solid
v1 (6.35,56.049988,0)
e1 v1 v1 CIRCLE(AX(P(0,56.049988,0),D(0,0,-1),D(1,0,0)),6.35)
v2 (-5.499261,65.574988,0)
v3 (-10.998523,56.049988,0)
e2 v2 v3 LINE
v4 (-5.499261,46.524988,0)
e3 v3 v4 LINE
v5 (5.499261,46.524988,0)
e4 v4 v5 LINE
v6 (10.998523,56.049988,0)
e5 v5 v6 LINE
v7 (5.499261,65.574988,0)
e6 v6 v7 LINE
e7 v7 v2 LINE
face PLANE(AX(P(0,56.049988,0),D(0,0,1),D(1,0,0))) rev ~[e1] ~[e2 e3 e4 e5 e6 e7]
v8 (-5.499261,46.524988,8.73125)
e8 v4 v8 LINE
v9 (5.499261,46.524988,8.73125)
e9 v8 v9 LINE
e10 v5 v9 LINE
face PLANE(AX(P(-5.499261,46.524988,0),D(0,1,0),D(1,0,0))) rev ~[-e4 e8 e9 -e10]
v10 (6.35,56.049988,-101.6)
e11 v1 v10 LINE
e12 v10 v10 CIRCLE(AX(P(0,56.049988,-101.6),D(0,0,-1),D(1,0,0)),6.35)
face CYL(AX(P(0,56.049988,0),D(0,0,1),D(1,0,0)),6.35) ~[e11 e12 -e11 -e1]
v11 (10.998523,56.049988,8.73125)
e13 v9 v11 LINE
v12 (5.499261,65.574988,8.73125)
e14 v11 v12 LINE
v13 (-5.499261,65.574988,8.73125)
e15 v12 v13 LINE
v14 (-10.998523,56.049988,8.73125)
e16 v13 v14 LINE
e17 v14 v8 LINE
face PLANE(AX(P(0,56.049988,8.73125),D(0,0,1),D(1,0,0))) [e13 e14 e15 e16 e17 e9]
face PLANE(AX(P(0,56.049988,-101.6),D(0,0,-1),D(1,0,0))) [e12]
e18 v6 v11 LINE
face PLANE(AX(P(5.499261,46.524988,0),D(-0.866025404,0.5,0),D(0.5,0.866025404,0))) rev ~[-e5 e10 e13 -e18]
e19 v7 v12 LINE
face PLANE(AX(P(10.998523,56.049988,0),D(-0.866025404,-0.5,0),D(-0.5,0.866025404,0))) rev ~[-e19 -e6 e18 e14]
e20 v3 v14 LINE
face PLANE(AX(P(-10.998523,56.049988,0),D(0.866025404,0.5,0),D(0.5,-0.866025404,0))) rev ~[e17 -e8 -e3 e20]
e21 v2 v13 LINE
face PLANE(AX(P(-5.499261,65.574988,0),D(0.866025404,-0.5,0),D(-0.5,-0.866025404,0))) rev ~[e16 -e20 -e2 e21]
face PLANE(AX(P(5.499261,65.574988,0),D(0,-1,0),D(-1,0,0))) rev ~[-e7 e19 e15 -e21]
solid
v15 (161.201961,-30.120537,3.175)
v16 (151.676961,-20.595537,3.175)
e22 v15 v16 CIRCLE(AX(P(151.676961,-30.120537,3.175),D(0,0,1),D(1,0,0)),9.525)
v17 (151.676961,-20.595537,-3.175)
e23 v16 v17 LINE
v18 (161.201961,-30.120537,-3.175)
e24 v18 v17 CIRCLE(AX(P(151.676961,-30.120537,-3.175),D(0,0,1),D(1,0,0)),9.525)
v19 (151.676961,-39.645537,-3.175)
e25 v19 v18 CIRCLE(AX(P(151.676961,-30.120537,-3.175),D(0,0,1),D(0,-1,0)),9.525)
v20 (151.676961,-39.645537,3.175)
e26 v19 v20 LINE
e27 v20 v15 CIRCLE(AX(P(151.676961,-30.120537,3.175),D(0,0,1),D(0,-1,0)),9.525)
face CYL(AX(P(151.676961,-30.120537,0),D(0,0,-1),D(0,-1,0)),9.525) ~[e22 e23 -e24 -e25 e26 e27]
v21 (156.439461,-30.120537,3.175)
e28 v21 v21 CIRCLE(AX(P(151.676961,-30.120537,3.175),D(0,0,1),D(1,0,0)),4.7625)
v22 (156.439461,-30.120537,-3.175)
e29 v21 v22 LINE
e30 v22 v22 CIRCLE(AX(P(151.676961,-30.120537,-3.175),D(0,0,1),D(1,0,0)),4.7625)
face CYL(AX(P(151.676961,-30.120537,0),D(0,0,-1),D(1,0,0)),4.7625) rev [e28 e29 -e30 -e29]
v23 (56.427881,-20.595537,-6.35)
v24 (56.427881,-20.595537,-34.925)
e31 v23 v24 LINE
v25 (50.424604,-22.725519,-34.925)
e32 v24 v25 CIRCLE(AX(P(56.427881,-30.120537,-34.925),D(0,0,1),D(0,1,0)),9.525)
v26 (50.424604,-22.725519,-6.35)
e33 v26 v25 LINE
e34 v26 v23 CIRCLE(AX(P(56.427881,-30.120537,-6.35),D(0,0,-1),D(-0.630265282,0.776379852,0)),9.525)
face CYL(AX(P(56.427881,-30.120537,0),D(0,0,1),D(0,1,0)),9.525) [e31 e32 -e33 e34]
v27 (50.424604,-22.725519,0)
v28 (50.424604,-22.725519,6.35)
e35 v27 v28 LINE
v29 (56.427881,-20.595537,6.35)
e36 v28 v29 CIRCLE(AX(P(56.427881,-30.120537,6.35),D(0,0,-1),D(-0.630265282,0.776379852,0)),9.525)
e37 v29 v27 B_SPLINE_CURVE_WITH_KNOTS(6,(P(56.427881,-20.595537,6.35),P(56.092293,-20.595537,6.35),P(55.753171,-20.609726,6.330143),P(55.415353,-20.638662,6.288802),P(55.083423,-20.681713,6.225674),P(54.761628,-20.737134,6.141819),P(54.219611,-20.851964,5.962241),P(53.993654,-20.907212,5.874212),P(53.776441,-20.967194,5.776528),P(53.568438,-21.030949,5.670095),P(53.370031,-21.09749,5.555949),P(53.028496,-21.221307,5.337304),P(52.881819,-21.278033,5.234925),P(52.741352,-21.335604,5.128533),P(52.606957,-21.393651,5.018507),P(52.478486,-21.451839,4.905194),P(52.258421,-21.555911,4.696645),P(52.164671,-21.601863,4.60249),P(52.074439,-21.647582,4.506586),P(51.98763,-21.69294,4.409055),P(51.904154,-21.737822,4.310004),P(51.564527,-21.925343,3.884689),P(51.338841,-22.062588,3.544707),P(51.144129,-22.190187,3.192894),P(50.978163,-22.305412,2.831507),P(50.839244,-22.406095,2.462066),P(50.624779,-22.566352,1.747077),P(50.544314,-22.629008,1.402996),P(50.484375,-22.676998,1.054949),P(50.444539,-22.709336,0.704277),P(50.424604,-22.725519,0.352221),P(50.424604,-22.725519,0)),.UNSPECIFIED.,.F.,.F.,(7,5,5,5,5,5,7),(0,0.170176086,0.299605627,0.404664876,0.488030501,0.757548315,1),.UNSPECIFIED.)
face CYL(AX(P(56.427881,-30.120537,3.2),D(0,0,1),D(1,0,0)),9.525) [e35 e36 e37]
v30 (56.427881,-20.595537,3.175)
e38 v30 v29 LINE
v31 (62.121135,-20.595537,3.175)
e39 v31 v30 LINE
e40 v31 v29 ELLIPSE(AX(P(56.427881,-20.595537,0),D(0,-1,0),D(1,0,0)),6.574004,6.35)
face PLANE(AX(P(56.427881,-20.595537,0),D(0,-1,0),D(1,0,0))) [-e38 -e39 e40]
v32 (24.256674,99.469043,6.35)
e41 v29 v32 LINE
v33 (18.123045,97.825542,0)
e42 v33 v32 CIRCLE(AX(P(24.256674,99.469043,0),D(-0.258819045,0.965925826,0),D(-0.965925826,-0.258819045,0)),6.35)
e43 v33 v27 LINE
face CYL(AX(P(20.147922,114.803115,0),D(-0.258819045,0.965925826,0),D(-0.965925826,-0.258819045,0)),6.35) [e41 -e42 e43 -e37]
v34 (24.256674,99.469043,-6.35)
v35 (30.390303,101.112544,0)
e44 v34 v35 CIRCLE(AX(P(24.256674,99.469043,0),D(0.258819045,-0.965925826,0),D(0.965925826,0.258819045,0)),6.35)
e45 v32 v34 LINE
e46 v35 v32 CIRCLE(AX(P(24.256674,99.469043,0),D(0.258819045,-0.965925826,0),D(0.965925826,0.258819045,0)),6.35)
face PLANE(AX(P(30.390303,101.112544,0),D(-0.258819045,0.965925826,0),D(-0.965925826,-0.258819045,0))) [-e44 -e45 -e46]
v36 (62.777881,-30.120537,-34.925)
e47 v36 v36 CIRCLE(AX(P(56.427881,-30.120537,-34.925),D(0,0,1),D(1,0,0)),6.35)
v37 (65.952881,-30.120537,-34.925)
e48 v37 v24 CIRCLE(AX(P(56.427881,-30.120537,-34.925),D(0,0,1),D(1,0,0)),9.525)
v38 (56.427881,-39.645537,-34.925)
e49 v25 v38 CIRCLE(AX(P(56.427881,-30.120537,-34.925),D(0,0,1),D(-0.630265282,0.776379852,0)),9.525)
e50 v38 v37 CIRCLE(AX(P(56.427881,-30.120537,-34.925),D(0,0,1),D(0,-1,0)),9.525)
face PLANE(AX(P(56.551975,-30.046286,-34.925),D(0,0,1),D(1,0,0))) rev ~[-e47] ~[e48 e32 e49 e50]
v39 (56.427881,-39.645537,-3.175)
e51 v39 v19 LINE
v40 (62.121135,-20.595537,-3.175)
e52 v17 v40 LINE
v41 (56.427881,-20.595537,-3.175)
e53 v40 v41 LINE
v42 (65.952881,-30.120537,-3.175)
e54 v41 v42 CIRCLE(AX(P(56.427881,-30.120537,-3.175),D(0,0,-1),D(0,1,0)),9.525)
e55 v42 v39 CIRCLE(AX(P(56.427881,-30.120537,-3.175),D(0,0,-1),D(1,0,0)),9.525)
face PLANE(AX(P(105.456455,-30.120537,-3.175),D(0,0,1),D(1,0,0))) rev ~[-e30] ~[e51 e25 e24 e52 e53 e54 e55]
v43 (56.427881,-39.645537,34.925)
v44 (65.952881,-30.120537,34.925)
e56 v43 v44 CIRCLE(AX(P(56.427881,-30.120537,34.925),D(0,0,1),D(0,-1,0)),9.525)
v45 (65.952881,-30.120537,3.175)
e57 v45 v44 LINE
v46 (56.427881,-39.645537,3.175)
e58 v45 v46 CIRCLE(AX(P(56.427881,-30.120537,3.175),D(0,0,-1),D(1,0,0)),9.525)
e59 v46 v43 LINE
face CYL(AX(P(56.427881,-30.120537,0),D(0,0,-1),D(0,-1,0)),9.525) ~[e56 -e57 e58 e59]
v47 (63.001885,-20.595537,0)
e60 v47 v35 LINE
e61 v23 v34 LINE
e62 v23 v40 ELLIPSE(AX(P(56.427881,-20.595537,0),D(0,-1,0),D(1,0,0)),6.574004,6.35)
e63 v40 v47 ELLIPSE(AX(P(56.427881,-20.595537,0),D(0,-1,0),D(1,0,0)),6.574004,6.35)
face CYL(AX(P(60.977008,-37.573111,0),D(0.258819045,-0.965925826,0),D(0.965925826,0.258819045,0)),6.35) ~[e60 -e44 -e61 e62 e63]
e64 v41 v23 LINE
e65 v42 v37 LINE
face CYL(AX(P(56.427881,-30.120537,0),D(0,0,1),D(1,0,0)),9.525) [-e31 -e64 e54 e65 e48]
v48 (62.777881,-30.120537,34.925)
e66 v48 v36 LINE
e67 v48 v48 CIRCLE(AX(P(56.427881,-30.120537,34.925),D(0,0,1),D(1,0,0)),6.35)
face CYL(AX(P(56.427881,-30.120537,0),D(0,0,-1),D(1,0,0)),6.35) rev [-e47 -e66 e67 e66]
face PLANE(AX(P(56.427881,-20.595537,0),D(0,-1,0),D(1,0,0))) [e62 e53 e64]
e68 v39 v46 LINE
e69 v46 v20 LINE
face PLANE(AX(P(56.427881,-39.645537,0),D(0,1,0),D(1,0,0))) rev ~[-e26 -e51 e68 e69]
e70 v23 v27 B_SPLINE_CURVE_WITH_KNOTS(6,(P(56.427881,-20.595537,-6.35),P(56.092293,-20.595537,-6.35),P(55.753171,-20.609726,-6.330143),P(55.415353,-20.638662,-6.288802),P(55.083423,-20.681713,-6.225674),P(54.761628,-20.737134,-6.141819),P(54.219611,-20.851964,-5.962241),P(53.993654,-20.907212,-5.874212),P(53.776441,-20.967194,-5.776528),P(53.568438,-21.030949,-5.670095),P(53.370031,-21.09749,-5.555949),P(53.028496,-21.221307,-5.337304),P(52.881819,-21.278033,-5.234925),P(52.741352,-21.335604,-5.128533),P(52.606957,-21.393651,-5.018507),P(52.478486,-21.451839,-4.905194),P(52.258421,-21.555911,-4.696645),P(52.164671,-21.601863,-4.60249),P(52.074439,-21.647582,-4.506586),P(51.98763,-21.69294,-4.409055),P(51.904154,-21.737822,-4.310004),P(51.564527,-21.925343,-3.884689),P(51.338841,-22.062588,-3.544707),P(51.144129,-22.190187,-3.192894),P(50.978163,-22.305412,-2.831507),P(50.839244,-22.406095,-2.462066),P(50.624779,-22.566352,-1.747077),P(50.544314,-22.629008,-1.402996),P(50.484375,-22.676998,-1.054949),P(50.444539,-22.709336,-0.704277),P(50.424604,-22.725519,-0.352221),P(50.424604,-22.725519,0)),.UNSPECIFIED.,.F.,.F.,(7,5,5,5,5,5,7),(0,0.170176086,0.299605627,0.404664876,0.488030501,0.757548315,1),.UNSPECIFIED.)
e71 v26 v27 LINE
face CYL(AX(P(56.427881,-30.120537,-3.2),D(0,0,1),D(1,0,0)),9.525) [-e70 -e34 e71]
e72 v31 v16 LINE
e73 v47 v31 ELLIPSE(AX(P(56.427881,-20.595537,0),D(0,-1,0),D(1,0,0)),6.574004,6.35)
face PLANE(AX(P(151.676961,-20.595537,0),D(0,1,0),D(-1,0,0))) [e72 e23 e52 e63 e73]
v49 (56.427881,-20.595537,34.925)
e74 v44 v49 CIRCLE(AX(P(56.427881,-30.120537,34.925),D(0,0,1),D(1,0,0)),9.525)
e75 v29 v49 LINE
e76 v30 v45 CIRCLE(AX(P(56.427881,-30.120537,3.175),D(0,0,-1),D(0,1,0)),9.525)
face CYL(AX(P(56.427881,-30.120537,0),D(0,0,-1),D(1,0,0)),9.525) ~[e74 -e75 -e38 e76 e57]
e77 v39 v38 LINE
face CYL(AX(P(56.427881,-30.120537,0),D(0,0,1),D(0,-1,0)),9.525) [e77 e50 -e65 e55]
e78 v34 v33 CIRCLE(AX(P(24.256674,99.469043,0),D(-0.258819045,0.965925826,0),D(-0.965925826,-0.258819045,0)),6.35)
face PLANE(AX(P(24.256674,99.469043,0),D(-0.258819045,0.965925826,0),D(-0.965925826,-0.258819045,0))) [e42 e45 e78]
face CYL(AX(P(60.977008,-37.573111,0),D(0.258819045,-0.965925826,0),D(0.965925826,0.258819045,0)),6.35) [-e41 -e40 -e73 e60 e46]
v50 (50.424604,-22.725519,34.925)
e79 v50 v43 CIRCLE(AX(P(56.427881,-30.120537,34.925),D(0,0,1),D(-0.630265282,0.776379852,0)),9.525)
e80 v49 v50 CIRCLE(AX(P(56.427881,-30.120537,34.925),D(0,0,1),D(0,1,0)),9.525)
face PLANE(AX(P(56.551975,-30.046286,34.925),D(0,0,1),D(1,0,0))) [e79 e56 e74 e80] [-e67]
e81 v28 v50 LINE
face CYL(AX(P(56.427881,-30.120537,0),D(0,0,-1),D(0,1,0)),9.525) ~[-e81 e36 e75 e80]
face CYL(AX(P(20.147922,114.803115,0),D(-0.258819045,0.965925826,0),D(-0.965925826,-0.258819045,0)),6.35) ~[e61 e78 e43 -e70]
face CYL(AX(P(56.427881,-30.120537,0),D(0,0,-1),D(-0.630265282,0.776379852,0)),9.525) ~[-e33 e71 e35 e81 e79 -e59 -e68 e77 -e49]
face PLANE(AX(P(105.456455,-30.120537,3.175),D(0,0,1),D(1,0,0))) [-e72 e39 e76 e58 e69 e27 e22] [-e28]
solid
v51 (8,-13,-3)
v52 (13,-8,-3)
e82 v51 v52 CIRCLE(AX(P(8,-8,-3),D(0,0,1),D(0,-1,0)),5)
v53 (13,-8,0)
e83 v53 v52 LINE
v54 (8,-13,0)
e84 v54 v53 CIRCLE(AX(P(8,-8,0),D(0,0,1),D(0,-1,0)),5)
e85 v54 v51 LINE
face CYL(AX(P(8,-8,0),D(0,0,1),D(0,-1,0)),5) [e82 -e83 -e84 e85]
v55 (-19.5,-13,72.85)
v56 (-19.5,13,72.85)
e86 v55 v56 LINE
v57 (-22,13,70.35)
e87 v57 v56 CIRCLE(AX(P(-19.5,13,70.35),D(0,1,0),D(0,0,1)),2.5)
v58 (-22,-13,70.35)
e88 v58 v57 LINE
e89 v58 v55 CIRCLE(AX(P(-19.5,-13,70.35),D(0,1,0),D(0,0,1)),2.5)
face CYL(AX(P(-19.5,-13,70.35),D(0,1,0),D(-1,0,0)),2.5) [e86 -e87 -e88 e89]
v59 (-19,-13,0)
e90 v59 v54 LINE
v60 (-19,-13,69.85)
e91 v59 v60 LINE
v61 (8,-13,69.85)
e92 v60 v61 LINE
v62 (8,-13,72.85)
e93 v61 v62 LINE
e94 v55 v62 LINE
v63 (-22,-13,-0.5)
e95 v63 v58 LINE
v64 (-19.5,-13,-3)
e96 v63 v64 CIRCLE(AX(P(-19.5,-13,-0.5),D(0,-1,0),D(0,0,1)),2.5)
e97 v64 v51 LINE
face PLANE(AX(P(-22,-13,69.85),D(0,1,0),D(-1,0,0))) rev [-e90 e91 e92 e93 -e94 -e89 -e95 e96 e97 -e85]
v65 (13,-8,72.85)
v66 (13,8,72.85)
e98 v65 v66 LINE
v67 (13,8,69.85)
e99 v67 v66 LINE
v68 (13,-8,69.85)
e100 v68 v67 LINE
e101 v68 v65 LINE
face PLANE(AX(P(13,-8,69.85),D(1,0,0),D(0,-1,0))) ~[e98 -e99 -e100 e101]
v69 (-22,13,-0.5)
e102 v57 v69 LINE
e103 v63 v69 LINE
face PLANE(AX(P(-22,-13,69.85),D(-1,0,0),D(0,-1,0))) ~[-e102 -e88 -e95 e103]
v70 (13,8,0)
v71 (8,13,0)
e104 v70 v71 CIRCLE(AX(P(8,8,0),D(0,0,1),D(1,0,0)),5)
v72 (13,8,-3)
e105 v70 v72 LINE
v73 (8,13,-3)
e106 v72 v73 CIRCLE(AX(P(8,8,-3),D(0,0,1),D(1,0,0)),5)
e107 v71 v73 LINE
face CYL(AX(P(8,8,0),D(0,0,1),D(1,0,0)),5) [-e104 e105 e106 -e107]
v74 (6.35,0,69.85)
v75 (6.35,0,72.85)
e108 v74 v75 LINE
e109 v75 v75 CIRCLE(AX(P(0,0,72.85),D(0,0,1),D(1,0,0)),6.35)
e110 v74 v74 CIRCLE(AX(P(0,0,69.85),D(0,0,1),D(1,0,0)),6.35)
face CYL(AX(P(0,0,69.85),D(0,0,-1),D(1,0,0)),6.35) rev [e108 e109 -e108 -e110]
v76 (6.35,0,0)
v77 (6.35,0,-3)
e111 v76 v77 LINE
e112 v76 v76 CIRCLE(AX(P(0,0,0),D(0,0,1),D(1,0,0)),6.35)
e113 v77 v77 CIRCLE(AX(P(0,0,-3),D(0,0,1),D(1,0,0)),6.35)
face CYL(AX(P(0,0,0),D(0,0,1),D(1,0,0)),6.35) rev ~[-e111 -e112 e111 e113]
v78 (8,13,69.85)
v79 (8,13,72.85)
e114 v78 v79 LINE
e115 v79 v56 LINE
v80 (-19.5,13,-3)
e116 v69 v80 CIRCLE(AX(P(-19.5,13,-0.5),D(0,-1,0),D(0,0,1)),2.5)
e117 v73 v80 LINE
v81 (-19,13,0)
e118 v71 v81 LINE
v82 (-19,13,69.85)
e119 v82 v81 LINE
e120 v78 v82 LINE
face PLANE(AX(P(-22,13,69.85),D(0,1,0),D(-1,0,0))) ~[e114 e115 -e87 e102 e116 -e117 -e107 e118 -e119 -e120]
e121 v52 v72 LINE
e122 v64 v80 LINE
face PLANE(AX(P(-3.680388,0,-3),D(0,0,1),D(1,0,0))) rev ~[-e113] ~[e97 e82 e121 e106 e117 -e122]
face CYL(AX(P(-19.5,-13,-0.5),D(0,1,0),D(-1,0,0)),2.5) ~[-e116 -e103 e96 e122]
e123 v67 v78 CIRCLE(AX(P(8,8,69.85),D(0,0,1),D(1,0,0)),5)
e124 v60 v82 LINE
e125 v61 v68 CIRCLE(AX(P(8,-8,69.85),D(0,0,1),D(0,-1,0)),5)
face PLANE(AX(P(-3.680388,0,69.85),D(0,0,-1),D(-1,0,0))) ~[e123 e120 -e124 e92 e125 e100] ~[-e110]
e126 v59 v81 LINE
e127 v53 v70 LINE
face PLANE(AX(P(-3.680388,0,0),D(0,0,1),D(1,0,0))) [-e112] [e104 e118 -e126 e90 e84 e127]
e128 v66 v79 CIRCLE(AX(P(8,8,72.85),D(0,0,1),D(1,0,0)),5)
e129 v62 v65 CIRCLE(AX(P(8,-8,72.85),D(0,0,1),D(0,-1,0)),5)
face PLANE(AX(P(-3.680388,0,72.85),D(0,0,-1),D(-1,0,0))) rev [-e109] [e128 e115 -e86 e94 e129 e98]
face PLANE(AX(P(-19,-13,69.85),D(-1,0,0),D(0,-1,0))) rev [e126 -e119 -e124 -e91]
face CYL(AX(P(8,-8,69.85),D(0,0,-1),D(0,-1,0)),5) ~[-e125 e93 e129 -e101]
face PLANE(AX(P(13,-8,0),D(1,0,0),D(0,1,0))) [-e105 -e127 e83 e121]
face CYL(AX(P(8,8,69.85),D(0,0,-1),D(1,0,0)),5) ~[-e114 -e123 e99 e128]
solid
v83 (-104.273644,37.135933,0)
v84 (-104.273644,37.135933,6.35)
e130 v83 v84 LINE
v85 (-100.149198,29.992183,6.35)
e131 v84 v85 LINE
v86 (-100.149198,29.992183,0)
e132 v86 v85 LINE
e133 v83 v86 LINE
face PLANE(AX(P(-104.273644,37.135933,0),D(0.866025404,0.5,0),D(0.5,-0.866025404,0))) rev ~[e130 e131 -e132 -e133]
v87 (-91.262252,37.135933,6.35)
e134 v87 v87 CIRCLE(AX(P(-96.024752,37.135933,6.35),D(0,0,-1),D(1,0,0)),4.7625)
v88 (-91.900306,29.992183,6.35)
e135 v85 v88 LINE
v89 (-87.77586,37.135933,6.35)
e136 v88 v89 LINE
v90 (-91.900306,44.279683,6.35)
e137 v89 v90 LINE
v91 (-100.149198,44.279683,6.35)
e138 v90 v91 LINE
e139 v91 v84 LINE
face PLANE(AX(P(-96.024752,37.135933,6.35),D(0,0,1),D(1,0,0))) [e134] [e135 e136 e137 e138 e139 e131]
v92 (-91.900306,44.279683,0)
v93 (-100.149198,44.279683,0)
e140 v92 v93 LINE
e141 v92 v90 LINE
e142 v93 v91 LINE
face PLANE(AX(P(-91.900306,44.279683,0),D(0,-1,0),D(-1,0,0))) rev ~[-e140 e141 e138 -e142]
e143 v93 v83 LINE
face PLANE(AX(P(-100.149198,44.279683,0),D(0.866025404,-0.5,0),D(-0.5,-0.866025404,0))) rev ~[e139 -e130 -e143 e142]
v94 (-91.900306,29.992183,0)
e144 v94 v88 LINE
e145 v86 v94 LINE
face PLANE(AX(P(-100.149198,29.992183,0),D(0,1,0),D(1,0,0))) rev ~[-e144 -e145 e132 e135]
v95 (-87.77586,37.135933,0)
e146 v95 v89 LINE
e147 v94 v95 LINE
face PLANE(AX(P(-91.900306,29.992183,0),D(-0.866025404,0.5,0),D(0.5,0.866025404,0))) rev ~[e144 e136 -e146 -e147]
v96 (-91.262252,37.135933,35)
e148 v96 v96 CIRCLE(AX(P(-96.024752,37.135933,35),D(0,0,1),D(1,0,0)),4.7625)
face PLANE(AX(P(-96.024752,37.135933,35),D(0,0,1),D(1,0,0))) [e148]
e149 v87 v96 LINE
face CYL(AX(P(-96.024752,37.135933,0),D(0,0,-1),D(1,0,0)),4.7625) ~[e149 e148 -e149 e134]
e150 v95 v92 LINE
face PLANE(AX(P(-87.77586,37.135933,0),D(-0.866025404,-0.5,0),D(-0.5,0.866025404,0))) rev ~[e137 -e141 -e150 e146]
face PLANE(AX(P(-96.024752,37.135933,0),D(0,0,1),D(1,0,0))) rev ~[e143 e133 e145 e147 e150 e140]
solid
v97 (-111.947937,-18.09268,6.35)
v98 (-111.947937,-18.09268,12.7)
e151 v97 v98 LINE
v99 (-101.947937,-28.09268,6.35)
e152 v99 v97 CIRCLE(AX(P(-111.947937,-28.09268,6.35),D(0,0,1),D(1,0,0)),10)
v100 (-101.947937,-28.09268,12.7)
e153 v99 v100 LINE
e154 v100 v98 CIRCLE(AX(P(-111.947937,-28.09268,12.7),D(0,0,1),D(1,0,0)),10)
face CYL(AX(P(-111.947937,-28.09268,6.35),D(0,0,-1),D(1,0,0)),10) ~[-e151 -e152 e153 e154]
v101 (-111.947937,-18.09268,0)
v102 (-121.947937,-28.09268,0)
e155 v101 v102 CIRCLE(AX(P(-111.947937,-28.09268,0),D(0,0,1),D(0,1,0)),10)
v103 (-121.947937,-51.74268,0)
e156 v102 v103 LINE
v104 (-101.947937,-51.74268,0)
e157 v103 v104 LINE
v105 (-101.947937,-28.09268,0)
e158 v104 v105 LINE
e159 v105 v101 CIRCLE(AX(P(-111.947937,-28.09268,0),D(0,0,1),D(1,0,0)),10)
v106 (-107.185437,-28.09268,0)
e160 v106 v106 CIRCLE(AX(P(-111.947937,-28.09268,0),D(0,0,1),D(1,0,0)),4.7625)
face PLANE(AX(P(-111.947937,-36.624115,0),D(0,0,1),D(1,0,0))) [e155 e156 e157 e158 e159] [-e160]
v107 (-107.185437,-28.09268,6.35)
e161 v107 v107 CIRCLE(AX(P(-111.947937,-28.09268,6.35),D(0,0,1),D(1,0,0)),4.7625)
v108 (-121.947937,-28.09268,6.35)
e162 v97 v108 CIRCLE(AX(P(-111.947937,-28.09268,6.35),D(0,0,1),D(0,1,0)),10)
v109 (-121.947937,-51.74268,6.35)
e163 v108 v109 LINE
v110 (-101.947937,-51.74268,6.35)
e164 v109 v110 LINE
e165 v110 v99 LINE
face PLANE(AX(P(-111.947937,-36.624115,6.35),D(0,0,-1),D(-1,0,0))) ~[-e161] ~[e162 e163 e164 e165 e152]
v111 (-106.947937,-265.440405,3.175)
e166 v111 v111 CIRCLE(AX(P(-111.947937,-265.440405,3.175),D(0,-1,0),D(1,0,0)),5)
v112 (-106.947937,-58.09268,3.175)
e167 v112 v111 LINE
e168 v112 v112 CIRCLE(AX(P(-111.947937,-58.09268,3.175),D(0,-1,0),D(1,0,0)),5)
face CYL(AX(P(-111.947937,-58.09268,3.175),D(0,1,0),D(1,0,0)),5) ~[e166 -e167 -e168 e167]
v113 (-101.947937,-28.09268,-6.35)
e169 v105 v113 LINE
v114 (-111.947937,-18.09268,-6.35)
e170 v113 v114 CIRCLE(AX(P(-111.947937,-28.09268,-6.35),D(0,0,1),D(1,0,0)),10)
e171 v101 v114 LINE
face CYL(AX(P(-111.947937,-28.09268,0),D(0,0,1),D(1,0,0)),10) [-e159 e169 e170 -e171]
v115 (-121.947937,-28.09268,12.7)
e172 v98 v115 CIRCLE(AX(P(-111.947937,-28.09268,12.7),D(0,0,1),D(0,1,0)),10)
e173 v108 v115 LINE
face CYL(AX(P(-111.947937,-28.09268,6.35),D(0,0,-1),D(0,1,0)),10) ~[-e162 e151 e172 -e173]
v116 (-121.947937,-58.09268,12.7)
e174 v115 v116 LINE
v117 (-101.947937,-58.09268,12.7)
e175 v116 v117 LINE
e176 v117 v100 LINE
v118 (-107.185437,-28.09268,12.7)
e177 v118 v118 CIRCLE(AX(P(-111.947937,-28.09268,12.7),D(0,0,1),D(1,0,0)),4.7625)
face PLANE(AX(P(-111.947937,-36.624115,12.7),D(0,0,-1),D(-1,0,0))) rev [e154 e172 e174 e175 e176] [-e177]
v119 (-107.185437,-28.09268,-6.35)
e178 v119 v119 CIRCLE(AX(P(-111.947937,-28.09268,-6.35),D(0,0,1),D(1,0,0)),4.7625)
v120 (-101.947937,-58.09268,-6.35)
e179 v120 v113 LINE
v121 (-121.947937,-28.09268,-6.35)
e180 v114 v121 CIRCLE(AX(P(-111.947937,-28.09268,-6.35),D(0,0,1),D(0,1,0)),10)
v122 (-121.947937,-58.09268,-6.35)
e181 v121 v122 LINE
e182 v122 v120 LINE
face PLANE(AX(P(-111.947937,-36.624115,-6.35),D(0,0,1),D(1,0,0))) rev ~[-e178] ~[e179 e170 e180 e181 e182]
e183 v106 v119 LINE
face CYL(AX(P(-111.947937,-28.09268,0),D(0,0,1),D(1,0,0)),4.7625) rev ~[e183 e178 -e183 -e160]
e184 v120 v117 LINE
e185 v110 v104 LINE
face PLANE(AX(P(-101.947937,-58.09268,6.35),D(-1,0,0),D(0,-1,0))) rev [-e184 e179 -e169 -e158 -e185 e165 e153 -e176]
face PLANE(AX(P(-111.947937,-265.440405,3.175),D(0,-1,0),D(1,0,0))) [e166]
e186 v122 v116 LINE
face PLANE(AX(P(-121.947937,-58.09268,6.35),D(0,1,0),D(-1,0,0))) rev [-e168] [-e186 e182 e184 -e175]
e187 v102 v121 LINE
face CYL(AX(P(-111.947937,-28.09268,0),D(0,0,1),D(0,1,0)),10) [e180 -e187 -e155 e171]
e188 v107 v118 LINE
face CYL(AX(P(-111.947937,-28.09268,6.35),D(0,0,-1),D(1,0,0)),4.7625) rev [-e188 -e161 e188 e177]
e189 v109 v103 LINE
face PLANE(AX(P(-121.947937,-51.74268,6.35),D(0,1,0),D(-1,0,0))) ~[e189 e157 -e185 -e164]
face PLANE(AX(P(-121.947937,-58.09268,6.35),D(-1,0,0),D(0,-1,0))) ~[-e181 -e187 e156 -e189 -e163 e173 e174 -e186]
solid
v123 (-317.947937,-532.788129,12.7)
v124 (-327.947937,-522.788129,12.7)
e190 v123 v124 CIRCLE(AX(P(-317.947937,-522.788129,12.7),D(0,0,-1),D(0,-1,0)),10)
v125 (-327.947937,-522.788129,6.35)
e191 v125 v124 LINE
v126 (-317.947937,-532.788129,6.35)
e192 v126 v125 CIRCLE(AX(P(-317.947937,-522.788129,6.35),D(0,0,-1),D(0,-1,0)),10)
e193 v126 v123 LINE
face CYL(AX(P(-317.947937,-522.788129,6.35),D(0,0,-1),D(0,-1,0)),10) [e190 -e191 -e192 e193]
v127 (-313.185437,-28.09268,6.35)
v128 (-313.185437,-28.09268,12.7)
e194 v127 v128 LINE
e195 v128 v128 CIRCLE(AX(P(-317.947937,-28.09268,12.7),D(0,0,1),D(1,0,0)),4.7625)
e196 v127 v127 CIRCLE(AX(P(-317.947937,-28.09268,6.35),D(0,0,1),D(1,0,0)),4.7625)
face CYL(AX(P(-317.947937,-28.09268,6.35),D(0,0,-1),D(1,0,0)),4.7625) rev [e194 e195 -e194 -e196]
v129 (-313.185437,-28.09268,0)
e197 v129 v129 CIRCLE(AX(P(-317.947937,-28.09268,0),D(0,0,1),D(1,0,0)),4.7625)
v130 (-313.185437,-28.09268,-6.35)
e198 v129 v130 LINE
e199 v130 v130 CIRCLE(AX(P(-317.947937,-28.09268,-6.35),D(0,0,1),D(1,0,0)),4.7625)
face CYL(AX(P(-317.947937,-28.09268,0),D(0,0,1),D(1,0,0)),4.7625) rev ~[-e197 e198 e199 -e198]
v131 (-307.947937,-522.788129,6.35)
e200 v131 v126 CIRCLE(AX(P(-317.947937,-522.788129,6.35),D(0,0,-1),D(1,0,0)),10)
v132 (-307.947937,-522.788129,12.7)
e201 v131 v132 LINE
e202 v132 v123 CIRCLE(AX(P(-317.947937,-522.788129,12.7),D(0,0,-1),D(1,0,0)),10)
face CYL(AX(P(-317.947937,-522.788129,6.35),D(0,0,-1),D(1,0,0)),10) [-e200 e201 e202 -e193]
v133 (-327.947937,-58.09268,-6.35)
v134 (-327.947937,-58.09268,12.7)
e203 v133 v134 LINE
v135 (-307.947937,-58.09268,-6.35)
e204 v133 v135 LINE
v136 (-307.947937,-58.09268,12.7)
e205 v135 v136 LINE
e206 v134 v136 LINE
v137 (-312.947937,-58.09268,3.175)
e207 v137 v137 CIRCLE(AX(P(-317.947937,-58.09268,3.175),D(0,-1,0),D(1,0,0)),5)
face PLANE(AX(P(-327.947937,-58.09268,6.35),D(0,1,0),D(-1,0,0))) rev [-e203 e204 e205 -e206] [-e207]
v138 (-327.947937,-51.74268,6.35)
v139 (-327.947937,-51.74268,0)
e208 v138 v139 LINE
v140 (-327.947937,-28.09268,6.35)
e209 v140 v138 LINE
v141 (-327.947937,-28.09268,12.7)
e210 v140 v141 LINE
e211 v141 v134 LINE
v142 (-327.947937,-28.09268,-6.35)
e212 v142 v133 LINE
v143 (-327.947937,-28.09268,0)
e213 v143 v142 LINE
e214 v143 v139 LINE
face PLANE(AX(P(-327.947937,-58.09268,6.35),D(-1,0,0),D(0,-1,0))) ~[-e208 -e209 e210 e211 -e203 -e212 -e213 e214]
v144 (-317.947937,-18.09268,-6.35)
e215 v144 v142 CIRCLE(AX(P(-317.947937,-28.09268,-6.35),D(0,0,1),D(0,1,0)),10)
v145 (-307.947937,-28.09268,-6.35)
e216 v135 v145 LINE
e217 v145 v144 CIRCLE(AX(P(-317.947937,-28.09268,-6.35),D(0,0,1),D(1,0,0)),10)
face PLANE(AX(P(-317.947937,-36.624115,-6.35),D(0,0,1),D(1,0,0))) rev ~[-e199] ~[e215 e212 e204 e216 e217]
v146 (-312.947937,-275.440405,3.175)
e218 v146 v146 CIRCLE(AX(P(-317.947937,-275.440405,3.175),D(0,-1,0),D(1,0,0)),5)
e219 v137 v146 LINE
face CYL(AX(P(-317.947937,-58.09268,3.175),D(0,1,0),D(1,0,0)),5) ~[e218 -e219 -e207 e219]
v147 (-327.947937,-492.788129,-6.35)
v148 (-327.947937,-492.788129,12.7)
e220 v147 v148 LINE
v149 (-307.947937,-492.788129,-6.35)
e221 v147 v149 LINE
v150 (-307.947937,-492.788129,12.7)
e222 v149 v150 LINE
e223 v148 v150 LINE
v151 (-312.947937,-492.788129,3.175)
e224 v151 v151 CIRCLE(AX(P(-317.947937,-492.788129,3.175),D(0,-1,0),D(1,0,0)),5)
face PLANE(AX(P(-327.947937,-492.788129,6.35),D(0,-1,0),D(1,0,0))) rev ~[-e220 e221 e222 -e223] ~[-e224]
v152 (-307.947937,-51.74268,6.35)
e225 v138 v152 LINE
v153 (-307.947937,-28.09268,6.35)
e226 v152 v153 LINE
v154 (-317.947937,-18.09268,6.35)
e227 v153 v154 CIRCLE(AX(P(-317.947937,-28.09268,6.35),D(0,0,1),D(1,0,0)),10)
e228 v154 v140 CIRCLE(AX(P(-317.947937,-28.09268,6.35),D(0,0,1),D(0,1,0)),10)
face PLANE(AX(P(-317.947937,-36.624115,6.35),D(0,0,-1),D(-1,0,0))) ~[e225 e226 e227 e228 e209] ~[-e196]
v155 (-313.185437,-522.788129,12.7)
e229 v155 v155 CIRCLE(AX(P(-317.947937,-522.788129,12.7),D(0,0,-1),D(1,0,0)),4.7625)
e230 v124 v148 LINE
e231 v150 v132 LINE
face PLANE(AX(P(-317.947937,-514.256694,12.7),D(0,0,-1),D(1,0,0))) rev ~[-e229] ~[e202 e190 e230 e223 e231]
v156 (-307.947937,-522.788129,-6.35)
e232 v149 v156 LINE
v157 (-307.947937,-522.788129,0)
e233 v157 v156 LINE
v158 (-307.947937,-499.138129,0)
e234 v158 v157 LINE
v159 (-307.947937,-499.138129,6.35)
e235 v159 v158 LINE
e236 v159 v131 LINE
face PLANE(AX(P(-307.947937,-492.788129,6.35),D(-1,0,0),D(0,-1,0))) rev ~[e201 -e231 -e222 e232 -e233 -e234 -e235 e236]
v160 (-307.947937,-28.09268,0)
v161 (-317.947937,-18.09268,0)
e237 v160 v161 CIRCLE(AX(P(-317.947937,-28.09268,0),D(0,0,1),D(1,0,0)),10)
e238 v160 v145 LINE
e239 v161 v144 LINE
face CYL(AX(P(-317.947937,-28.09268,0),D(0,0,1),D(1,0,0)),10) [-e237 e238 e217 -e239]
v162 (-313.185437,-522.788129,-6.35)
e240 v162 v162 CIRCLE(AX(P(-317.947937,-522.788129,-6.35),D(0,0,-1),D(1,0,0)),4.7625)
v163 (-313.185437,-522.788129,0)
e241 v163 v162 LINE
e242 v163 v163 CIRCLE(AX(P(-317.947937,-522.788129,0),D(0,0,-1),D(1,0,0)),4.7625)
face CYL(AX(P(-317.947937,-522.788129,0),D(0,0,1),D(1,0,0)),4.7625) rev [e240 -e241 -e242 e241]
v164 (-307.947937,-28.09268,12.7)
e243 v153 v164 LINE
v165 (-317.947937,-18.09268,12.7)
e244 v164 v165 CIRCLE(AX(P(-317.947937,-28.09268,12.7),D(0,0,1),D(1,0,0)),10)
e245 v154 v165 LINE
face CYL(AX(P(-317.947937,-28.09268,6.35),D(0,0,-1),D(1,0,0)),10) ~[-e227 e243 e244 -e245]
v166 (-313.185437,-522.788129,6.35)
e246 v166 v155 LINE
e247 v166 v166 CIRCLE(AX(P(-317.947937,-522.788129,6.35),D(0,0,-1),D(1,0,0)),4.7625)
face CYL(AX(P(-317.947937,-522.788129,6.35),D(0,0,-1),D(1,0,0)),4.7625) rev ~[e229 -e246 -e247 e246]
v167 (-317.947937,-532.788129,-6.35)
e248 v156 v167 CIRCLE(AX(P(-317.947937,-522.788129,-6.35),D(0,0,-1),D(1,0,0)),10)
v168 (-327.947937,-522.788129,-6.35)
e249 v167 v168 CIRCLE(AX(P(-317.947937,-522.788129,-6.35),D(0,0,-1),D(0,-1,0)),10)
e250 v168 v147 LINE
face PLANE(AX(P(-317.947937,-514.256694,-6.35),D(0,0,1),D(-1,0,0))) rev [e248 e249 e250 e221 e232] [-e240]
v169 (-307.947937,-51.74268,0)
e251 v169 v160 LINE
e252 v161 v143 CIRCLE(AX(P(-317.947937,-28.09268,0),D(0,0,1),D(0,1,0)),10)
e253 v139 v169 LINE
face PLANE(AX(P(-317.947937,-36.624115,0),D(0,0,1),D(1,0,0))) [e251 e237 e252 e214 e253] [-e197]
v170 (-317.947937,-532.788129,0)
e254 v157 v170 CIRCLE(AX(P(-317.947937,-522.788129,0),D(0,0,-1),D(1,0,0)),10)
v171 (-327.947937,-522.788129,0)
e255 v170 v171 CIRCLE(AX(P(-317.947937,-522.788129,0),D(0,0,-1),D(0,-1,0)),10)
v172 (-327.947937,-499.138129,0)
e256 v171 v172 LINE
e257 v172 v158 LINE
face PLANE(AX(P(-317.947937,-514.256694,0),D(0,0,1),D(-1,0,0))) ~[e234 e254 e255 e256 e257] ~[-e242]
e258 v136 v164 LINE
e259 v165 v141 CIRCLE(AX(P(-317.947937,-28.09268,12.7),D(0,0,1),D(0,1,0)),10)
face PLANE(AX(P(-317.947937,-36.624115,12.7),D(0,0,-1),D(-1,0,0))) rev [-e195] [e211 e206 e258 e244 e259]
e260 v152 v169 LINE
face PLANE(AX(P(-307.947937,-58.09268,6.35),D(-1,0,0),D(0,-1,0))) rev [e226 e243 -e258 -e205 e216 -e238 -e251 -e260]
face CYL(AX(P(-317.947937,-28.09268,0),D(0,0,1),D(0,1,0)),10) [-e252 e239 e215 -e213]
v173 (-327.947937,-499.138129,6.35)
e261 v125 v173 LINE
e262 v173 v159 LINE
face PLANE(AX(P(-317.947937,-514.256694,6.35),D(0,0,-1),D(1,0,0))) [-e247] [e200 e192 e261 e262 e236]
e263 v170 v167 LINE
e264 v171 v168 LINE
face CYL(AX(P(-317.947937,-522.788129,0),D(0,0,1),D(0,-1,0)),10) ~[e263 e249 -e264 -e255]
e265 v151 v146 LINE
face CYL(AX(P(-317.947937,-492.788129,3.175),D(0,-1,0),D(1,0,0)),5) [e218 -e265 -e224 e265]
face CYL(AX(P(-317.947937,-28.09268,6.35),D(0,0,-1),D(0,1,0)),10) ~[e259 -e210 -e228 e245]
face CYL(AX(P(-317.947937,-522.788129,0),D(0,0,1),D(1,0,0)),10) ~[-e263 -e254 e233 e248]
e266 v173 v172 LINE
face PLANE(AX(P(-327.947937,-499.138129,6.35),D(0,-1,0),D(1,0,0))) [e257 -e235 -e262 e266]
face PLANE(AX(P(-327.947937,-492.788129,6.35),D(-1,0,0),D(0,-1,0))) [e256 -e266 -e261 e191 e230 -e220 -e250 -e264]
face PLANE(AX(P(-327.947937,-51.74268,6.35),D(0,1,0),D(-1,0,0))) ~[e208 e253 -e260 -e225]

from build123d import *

# Parameters (mm, degrees)
F0_R          = 6.35
F0_W          = 3
F0_H          = 26
F1_DEPTH      = 3
F2_DEPTH      = 34.925
F5_DEPTH      = 8.73125
F6_R          = 6.35
F7_DEPTH      = 101.6
F8_R          = 6.35
F9_DEPTH      = 34.925
F10_R         = 2.5
F8_R_2        = 4.7625
F11_DEPTH     = 3.175
F12_DEPTH     = 6.35
F13_T4_DEPTH  = 157.7514773719
F13_T9_DEPTH  = 156.5536421667
F13_S10_R     = 9.525
F13_T11_DEPTH = 81
F13_T15_DEPTH = 157.7514773719
F13_T20_DEPTH = 156.5536421667
F13_S21_R     = 9.525
F13_T22_DEPTH = 81
F14_R         = 4.7625
F14_W         = 20
F14_H         = 6.35
F15_DEPTH     = 6.35
F16_DEPTH     = 3.175
F18_R         = 4.7625
F19_DEPTH     = 6.35
F20_DEPTH     = 35
F22_R         = 5
F23_DEPTH     = 217.3477245
F25_R         = 5
F26_DEPTH     = 207.3477245


# Not quite as in the source:
# - a fillet or chamfer that OpenCascade refuses, or shapes differently, is made with other operations: its cross-section is extruded or revolved along the edge and cut away or added


with BuildPart() as f1:
    # F0 (on Top) → F1 (new body)
    with BuildSketch(Plane.XY):
        with BuildLine():
            ThreePointArc((13, 8), (11.5355339059, 11.5355339059), (8, 13))
            Line((8, 13), (-19, 13))
            Line((-19, 13), (-19, -13))
            Line((-19, -13), (8, -13))
            ThreePointArc((8, -13), (11.5355339059, -11.5355339059), (13, -8))
            Line((13, -8), (13, 8))
        make_face()
        Circle(F0_R, mode=Mode.SUBTRACT)
        with Locations((-20.5, 0)):
            Rectangle(F0_W, F0_H)
    extrude(amount=-F1_DEPTH)

    # F0 (on Top) → F2 (join)
    with BuildSketch(Plane.XY):
        with Locations((-20.5, 0)):
            Rectangle(F0_W, F0_H)
    extrude(amount=F2_DEPTH)

    # F3: F1 across face


with BuildPart() as f1_1:
    add(f1.part)
    add(f1.part.mirror(Plane(origin=(-20.5, 0, 34.925), x_dir=(1, 0, 0), z_dir=(0, 0, 1))))

    # F10
    f10_edges = [f1_1.edges().sort_by_distance(p)[0] for p in [
        (-22, 0, 72.85),
        (-22, 0, -3),
    ]]
    fillet(f10_edges, radius=F10_R)


with BuildPart() as f5:
    # F4 (on Top) → F5 (new body)
    with BuildSketch(Plane.XY):
        Polygon((5.499261314, 65.5749876738), (-5.499261314, 65.5749876738), (-10.9985226281, 56.0499876738), (-5.499261314, 46.5249876738), (5.499261314, 46.5249876738), (10.9985226281, 56.0499876738), align=None)
    extrude(amount=F5_DEPTH)

    # F6 (on face) → F7 (join)
    with BuildSketch(Plane(origin=(0, 0, 0), x_dir=(1, 0, 0), z_dir=(0, 0, -1))):
        with Locations((0, -56.0499876738)):
            Circle(F6_R)
    extrude(amount=F7_DEPTH)


with BuildPart() as f9:
    # F8 (on Top) → F9 (new body, symmetric)
    with BuildSketch(Plane.XY):
        with BuildLine():
            ThreePointArc((56.427881222, -39.6455373057), (63.1630733128, -36.8557293965), (65.952881222, -30.1205373057))
            ThreePointArc((65.952881222, -30.1205373057), (63.1630733128, -23.3853452149), (56.427881222, -20.5955373057))
            ThreePointArc((56.427881222, -20.5955373057), (53.2429104438, -21.1438126167), (50.4246044097, -22.7255192182))
            ThreePointArc((50.4246044097, -22.7255192182), (47.451156533, -33.3055080839), (56.427881222, -39.6455373057))
        make_face()
        with Locations((56.427881222, -30.1205373057)):
            Circle(F8_R, mode=Mode.SUBTRACT)
    extrude(amount=F9_DEPTH, both=True)

    # F8 (on Top) → F11 (join, symmetric)
    with BuildSketch(Plane.XY):
        with BuildLine():
            ThreePointArc((56.427881222, -20.5955373057), (63.1630733128, -23.3853452149), (65.952881222, -30.1205373057))
            ThreePointArc((65.952881222, -30.1205373057), (63.1630733128, -36.8557293965), (56.427881222, -39.6455373057))
            Line((56.427881222, -39.6455373057), (151.676961222, -39.6455373057))
            ThreePointArc((151.676961222, -39.6455373057), (158.4121533128, -36.8557293965), (161.201961222, -30.1205373057))
            ThreePointArc((161.201961222, -30.1205373057), (158.4121533128, -23.3853452149), (151.676961222, -20.5955373057))
            Line((151.676961222, -20.5955373057), (63.0018849676, -20.5955373057))
            Line((63.0018849676, -20.5955373057), (56.427881222, -20.5955373057))
        make_face()
        with Locations((151.676961222, -30.1205373057)):
            Circle(F8_R_2, mode=Mode.SUBTRACT)
    extrude(amount=F11_DEPTH, both=True)

    # F8 (on Top) → F12 (join, symmetric)
    with BuildSketch(Plane.XY):
        with BuildLine():
            ThreePointArc((50.4246044097, -22.7255192182), (53.2429104438, -21.1438126167), (56.427881222, -20.5955373057))
            Line((56.427881222, -20.5955373057), (63.0018849676, -20.5955373057))
            Line((63.0018849676, -20.5955373057), (30.3903029127, 101.1125438384))
            Line((30.3903029127, 101.1125438384), (24.2566739158, 99.469042902))
            Line((24.2566739158, 99.469042902), (18.1230449188, 97.8255419656))
            Line((18.1230449188, 97.8255419656), (50.4246044097, -22.7255192182))
        make_face()
    extrude(amount=F12_DEPTH, both=True)

    # F13: fillet of radius 6.35 on 4 edges, made by hand


with BuildPart() as f13_tool2:
    # F13_s3 → F13_t4 (new body)
    with BuildSketch(Plane(origin=(13.4779627171, -50.3004416428, 0), x_dir=(0, 0, 1), z_dir=(-0.2588190451, 0.9659258263, 0))):
        with BuildLine():
            ThreePointArc((0, 55.5246304963), (4.4901280605, 53.6647585568), (6.35, 49.1746304963))
            Line((6.35, 49.1746304963), (6.35, 55.5246304963))
            Line((6.35, 55.5246304963), (0, 55.5246304963))
        make_face()
    extrude(amount=F13_T4_DEPTH)

    split(bisect_by=Plane.XZ.offset(20.5955373057), keep=Keep.BOTTOM)


with BuildPart() as f9_1:
    add(f9.part)

    # F13_t1: cut F13_tool2
    add(f13_tool2.part, mode=Mode.SUBTRACT)


with BuildPart() as f13_tool7:
    # F13_s8 → F13_t9 (new body)
    with BuildSketch(Plane(origin=(-27.3511240198, 102.075784486, 0), x_dir=(0, 0, 1), z_dir=(0.2588190451, -0.9659258263, 0))):
        with BuildLine():
            ThreePointArc((0, -42.8246304963), (4.4901280605, -44.6845024357), (6.35, -49.1746304963))
            Line((6.35, -49.1746304963), (6.35, -42.8246304963))
            Line((6.35, -42.8246304963), (0, -42.8246304963))
        make_face()
    extrude(amount=F13_T9_DEPTH)

    # F13_s10 → F13_t11 (cut, symmetric)
    with BuildSketch(Plane.XY.offset(3.2)):
        with Locations((56.427881222, -30.1205373057)):
            Circle(F13_S10_R)
    extrude(amount=F13_T11_DEPTH, both=True, mode=Mode.SUBTRACT)


with BuildPart() as f9_2:
    add(f9_1.part)

    # F13_t6: cut F13_tool7
    add(f13_tool7.part, mode=Mode.SUBTRACT)


with BuildPart() as f13_tool13:
    # F13_s14 → F13_t15 (new body)
    with BuildSketch(Plane(origin=(13.4779627171, -50.3004416428, 0), x_dir=(0, 0, 1), z_dir=(-0.2588190451, 0.9659258263, 0))):
        with BuildLine():
            ThreePointArc((0, 55.5246304963), (-4.4901280605, 53.6647585568), (-6.35, 49.1746304963))
            Line((-6.35, 49.1746304963), (-6.35, 55.5246304963))
            Line((-6.35, 55.5246304963), (0, 55.5246304963))
        make_face()
    extrude(amount=F13_T15_DEPTH)

    split(bisect_by=Plane.XZ.offset(20.5955373057), keep=Keep.BOTTOM)


with BuildPart() as f9_3:
    add(f9_2.part)

    # F13_t12: cut F13_tool13
    add(f13_tool13.part, mode=Mode.SUBTRACT)


with BuildPart() as f13_tool18:
    # F13_s19 → F13_t20 (new body)
    with BuildSketch(Plane(origin=(-27.3511240198, 102.075784486, 0), x_dir=(0, 0, 1), z_dir=(0.2588190451, -0.9659258263, 0))):
        with BuildLine():
            ThreePointArc((0, -42.8246304963), (-4.4901280605, -44.6845024357), (-6.35, -49.1746304963))
            Line((-6.35, -49.1746304963), (-6.35, -42.8246304963))
            Line((-6.35, -42.8246304963), (0, -42.8246304963))
        make_face()
    extrude(amount=F13_T20_DEPTH)

    # F13_s21 → F13_t22 (cut, symmetric)
    with BuildSketch(Plane.XY.offset(-3.2)):
        with Locations((56.427881222, -30.1205373057)):
            Circle(F13_S21_R)
    extrude(amount=F13_T22_DEPTH, both=True, mode=Mode.SUBTRACT)


with BuildPart() as f9_4:
    add(f9_3.part)

    # F13_t17: cut F13_tool18
    add(f13_tool18.part, mode=Mode.SUBTRACT)


with BuildPart() as f15:
    # F14 (on Top) → F15 (new body)
    with BuildSketch(Plane.XY):
        with BuildLine():
            Line((-121.9479370444, -51.7426801049), (-101.9479370444, -51.7426801049))
            Line((-101.9479370444, -51.7426801049), (-101.9479370444, -28.0926801049))
            ThreePointArc((-101.9479370444, -28.0926801049), (-104.8768692325, -21.021612293), (-111.9479370444, -18.0926801049))
            ThreePointArc((-111.9479370444, -18.0926801049), (-119.0190048563, -21.021612293), (-121.9479370444, -28.0926801049))
            Line((-121.9479370444, -28.0926801049), (-121.9479370444, -51.7426801049))
        make_face()
        with Locations((-111.9479370444, -28.0926801049)):
            Circle(F14_R, mode=Mode.SUBTRACT)
        with Locations((-111.9479370444, -54.9176801049)):
            Rectangle(F14_W, F14_H)
    extrude(amount=-F15_DEPTH)

    # F14 (on Top) → F16 (join)
    with BuildSketch(Plane.XY):
        with Locations((-111.9479370444, -54.9176801049)):
            Rectangle(F14_W, F14_H)
    extrude(amount=F16_DEPTH)

    # F17: F15 across face


with BuildPart() as f15_1:
    add(f15.part)
    add(f15.part.mirror(Plane(origin=(-111.9479370444, -54.9176801049, 3.175), x_dir=(1, 0, 0), z_dir=(0, 0, 1))))


with BuildPart() as f19:
    # F18 (on Top) → F19 (new body)
    with BuildSketch(Plane.XY):
        Polygon((-91.9003056777, 44.2796825945), (-100.1491976487, 44.2796825945), (-104.2736436343, 37.1359325945), (-100.1491976487, 29.9921825945), (-91.9003056777, 29.9921825945), (-87.7758596922, 37.1359325945), align=None)
        with Locations((-96.0247516632, 37.1359325945)):
            Circle(F18_R, mode=Mode.SUBTRACT)
        with Locations((-96.0247516632, 37.1359325945)):
            Circle(F18_R)
    extrude(amount=F19_DEPTH)

    # F18 (on Top) → F20 (join)
    with BuildSketch(Plane.XY):
        with Locations((-96.0247516632, 37.1359325945)):
            Circle(F18_R)
    extrude(amount=F20_DEPTH)


with BuildPart() as f21_1:
    # F21: copy of F15
    add(f15_1.part.moved(Location((-206, 0, 0))))

    # F22 (on face) → F23 (join)
    with BuildSketch(Plane.XZ.offset(58.0926801049)):
        with Locations((-317.9479370444, 3.175)):
            Circle(F22_R)
    extrude(amount=F23_DEPTH)

    # F24: F21_1 across face


with BuildPart() as f21_1_1:
    add(f21_1.part)
    add(f21_1.part.mirror(Plane(origin=(-317.9479370444, -275.4404046049, 3.175), x_dir=(1, 0, 0), z_dir=(0, -1, 0))))


with BuildPart() as f15_2:
    add(f15_1.part)

    # F25 (on face) → F26 (join)
    with BuildSketch(Plane.XZ.offset(58.0926801049)):
        with Locations((-111.9479370444, 3.175)):
            Circle(F25_R)
    extrude(amount=F26_DEPTH)


solid = Compound([f1_1.part, f5.part, f9_4.part, f19.part, f21_1_1.part, f15_2.part])
